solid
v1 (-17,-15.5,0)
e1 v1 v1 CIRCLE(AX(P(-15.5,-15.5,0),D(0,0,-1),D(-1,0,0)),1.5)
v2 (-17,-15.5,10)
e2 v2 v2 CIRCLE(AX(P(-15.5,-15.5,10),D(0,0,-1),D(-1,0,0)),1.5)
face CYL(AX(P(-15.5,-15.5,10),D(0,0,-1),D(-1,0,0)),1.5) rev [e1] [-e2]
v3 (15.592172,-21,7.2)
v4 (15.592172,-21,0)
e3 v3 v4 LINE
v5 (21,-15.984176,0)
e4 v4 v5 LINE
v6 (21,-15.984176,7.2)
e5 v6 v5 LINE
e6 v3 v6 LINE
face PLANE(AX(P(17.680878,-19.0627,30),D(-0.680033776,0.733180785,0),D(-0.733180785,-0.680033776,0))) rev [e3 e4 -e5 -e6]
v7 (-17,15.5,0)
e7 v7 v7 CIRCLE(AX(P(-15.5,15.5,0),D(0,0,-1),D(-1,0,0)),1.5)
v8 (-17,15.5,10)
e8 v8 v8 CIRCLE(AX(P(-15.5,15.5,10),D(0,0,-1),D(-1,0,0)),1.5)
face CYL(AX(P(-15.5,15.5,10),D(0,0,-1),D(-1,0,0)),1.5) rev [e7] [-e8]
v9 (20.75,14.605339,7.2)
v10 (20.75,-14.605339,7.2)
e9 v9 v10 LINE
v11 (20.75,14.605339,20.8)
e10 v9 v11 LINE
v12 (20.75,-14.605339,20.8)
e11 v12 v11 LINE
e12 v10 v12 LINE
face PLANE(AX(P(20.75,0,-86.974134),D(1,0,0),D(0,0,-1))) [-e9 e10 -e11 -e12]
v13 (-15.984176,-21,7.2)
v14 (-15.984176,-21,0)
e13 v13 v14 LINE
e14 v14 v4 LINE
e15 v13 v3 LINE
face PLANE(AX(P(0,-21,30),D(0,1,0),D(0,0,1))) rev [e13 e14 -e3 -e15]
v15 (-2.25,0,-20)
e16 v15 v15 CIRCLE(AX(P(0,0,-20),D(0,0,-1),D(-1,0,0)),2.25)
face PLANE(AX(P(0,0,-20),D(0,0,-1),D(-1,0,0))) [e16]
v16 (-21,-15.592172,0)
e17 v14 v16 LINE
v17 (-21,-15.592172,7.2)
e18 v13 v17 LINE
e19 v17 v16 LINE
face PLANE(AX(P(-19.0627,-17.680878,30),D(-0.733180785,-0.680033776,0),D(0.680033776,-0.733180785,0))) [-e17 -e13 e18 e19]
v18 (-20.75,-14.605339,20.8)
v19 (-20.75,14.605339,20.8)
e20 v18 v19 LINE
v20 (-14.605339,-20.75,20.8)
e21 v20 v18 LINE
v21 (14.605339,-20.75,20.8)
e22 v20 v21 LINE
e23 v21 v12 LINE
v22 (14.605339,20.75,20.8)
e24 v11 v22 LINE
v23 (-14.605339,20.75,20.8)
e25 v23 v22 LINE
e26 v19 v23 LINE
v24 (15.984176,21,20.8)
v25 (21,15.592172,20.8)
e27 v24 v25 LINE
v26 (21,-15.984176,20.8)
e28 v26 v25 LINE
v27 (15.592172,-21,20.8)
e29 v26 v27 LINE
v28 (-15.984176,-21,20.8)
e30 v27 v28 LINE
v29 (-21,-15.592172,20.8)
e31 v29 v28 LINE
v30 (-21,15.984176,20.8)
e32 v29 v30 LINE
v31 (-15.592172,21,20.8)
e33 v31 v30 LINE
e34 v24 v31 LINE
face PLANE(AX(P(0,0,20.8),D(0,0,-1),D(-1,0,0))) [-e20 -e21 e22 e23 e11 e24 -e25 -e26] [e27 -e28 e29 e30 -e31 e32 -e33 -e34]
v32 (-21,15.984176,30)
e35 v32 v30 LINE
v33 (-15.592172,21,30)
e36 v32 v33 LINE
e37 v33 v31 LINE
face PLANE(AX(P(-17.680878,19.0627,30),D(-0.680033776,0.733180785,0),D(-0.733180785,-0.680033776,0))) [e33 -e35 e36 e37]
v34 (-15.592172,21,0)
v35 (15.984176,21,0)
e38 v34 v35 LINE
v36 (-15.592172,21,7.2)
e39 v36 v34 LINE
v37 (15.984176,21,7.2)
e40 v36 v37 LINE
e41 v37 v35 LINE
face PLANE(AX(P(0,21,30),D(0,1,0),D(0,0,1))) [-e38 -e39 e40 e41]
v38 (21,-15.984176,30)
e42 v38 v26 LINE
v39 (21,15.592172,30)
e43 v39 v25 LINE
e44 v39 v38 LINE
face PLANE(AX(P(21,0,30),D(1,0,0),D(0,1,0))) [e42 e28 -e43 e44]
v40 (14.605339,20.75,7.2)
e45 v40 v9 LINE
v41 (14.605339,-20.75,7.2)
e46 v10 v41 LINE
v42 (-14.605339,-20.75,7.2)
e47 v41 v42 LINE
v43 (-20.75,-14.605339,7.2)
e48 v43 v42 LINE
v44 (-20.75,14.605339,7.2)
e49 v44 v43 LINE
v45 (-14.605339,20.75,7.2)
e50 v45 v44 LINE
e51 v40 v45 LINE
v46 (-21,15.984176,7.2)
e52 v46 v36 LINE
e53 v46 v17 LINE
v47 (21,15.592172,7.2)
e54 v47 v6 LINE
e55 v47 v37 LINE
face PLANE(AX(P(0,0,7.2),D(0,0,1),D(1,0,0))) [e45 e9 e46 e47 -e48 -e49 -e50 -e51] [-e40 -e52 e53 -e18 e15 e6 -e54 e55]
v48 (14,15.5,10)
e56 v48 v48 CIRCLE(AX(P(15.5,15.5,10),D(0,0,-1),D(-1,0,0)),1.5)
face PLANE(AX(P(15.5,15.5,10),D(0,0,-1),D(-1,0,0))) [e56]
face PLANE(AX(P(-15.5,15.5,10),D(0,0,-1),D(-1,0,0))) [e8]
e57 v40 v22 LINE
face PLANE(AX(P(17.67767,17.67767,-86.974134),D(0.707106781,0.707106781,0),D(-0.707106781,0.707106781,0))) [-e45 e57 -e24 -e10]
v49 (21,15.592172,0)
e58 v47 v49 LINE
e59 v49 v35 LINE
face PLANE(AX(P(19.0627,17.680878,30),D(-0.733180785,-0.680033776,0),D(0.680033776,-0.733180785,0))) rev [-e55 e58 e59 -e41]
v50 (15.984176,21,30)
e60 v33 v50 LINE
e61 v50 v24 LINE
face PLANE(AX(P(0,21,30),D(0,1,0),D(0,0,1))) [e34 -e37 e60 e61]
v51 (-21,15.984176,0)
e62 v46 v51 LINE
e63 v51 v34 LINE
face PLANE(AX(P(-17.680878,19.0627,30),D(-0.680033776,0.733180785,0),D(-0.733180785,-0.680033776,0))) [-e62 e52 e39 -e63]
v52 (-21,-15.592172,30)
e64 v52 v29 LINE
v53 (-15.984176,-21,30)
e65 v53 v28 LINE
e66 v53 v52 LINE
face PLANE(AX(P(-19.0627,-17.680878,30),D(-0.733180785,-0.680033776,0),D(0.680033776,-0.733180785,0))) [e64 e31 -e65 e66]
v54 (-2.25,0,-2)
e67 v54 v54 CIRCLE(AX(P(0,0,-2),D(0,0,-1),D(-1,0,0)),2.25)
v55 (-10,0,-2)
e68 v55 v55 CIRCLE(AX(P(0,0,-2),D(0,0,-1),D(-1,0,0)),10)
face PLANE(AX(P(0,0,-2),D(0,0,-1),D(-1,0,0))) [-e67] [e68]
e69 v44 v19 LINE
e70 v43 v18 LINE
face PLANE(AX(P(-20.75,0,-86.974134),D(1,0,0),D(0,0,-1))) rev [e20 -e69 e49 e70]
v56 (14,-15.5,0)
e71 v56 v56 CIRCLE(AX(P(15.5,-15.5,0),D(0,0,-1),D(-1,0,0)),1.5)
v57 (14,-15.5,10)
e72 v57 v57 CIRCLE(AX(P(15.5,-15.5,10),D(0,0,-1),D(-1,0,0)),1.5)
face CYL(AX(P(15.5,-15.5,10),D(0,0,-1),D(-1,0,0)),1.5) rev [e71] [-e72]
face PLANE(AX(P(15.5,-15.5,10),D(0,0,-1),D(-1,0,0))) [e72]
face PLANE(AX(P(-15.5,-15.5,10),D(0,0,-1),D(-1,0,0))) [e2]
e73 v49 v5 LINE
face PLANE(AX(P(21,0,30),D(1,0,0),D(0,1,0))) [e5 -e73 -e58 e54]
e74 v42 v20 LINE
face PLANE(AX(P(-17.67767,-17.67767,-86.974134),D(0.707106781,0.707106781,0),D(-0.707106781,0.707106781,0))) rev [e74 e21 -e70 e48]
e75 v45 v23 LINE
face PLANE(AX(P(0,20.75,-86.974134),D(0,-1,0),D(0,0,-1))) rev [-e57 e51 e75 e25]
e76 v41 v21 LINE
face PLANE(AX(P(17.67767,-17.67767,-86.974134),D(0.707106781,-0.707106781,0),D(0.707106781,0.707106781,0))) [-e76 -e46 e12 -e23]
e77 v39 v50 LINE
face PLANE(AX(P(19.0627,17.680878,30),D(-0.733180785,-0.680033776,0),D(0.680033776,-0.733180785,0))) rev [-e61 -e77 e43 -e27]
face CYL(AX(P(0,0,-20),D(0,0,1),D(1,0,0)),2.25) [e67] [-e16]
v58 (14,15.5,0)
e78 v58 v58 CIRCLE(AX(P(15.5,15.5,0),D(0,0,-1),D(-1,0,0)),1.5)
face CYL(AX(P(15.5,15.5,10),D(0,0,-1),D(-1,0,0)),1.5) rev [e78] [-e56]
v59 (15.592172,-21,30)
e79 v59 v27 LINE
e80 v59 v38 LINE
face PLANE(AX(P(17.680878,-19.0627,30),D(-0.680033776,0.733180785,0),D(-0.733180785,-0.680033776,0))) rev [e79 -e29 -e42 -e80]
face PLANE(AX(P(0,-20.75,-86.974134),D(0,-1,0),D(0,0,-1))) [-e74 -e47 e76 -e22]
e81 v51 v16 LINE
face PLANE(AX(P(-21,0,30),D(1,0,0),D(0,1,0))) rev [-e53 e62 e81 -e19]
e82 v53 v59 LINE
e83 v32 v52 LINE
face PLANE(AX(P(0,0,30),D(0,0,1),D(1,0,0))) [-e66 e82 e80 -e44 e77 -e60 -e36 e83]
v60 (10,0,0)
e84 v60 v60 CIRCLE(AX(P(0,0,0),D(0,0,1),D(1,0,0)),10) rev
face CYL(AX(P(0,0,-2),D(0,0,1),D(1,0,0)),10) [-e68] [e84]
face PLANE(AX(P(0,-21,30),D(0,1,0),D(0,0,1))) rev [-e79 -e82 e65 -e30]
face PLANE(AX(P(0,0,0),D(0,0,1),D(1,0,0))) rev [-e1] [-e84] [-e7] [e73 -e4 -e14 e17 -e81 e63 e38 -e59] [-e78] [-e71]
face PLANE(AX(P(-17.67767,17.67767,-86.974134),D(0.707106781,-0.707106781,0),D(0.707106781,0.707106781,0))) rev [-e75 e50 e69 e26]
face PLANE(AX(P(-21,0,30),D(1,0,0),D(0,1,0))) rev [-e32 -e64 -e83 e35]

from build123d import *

# Parameters (mm, degrees)
RESSALTO_EXTRUS_O1_DEPTH   = 30
CORTE_EXTRUS_O_FINA1_START = -22.8
CORTE_EXTRUS_O_FINA1_DEPTH = 13.6
ESBO_O3_R                  = 2.25
RESSALTO_EXTRUS_O2_DEPTH   = 20
ESBO_O4_R                  = 10
RESSALTO_EXTRUS_O3_DEPTH   = 2
ESBO_O5_R                  = 1.5
CORTE_EXTRUS_O1_DEPTH      = 10


# Read off the part's stored shape, not the designer's step: Corte-Extrusão-Fina1
with BuildPart() as part:
    # Esboço1 → Ressalto-extrusão1 (new body)
    with BuildSketch(Plane.XY):
        Polygon((-21, -15.592171873), (-15.984175996, -21), (15.592171873, -21), (21, -15.984175996), (21, 15.592171873), (15.984175996, 21), (-15.592171873, 21), (-21, 15.984175996), align=None)
    extrude(amount=RESSALTO_EXTRUS_O1_DEPTH)

    # Corte-Extrusão-Fina1 outline → Corte-Extrusão-Fina1 (cut)
    with BuildSketch(Plane.XY.offset(30).offset(CORTE_EXTRUS_O_FINA1_START)):
        Polygon((15.592171873, -21), (21, -15.984175996), (21, 15.592171873), (15.984175996, 21), (-15.592171873, 21), (-21, 15.984175996), (-21, -15.592171873), (-15.984175996, -21), align=None)
        Polygon((14.605339059, 20.75), (20.75, 14.605339059), (20.75, -14.605339059), (14.605339059, -20.75), (-14.605339059, -20.75), (-20.75, -14.605339059), (-20.75, 14.605339059), (-14.605339059, 20.75), align=None, mode=Mode.SUBTRACT)
    extrude(amount=CORTE_EXTRUS_O_FINA1_DEPTH, mode=Mode.SUBTRACT)

    # Esboço3 → Ressalto-extrusão2 (add)
    with BuildSketch(Plane(origin=(0, 0, 0), x_dir=(-1, 0, 0), z_dir=(0, 0, -1))):
        with Locations(Location((0, 0, 0), (0, 0, 180))):
            Circle(ESBO_O3_R)
    extrude(amount=RESSALTO_EXTRUS_O2_DEPTH)

    # Esboço4 → Ressalto-extrusão3 (add)
    with BuildSketch(Plane(origin=(0, 0, 0), x_dir=(-1, 0, 0), z_dir=(0, 0, -1))):
        with Locations(Location((0, 0, 0), (0, 0, 180))):
            Circle(ESBO_O4_R)
    extrude(amount=RESSALTO_EXTRUS_O3_DEPTH)

    # Esboço5 → Corte-extrusão1 (cut)
    with BuildSketch(Plane(origin=(0, 0, 0), x_dir=(-1, 0, 0), z_dir=(0, 0, -1))):
        with Locations((15.5, -15.5)):
            Circle(ESBO_O5_R)
        with Locations((-15.5, -15.5)):
            Circle(ESBO_O5_R)
        with Locations((-15.5, 15.5)):
            Circle(ESBO_O5_R)
        with Locations((15.5, 15.5)):
            Circle(ESBO_O5_R)
    extrude(amount=-CORTE_EXTRUS_O1_DEPTH, mode=Mode.SUBTRACT)


solid = part.part
